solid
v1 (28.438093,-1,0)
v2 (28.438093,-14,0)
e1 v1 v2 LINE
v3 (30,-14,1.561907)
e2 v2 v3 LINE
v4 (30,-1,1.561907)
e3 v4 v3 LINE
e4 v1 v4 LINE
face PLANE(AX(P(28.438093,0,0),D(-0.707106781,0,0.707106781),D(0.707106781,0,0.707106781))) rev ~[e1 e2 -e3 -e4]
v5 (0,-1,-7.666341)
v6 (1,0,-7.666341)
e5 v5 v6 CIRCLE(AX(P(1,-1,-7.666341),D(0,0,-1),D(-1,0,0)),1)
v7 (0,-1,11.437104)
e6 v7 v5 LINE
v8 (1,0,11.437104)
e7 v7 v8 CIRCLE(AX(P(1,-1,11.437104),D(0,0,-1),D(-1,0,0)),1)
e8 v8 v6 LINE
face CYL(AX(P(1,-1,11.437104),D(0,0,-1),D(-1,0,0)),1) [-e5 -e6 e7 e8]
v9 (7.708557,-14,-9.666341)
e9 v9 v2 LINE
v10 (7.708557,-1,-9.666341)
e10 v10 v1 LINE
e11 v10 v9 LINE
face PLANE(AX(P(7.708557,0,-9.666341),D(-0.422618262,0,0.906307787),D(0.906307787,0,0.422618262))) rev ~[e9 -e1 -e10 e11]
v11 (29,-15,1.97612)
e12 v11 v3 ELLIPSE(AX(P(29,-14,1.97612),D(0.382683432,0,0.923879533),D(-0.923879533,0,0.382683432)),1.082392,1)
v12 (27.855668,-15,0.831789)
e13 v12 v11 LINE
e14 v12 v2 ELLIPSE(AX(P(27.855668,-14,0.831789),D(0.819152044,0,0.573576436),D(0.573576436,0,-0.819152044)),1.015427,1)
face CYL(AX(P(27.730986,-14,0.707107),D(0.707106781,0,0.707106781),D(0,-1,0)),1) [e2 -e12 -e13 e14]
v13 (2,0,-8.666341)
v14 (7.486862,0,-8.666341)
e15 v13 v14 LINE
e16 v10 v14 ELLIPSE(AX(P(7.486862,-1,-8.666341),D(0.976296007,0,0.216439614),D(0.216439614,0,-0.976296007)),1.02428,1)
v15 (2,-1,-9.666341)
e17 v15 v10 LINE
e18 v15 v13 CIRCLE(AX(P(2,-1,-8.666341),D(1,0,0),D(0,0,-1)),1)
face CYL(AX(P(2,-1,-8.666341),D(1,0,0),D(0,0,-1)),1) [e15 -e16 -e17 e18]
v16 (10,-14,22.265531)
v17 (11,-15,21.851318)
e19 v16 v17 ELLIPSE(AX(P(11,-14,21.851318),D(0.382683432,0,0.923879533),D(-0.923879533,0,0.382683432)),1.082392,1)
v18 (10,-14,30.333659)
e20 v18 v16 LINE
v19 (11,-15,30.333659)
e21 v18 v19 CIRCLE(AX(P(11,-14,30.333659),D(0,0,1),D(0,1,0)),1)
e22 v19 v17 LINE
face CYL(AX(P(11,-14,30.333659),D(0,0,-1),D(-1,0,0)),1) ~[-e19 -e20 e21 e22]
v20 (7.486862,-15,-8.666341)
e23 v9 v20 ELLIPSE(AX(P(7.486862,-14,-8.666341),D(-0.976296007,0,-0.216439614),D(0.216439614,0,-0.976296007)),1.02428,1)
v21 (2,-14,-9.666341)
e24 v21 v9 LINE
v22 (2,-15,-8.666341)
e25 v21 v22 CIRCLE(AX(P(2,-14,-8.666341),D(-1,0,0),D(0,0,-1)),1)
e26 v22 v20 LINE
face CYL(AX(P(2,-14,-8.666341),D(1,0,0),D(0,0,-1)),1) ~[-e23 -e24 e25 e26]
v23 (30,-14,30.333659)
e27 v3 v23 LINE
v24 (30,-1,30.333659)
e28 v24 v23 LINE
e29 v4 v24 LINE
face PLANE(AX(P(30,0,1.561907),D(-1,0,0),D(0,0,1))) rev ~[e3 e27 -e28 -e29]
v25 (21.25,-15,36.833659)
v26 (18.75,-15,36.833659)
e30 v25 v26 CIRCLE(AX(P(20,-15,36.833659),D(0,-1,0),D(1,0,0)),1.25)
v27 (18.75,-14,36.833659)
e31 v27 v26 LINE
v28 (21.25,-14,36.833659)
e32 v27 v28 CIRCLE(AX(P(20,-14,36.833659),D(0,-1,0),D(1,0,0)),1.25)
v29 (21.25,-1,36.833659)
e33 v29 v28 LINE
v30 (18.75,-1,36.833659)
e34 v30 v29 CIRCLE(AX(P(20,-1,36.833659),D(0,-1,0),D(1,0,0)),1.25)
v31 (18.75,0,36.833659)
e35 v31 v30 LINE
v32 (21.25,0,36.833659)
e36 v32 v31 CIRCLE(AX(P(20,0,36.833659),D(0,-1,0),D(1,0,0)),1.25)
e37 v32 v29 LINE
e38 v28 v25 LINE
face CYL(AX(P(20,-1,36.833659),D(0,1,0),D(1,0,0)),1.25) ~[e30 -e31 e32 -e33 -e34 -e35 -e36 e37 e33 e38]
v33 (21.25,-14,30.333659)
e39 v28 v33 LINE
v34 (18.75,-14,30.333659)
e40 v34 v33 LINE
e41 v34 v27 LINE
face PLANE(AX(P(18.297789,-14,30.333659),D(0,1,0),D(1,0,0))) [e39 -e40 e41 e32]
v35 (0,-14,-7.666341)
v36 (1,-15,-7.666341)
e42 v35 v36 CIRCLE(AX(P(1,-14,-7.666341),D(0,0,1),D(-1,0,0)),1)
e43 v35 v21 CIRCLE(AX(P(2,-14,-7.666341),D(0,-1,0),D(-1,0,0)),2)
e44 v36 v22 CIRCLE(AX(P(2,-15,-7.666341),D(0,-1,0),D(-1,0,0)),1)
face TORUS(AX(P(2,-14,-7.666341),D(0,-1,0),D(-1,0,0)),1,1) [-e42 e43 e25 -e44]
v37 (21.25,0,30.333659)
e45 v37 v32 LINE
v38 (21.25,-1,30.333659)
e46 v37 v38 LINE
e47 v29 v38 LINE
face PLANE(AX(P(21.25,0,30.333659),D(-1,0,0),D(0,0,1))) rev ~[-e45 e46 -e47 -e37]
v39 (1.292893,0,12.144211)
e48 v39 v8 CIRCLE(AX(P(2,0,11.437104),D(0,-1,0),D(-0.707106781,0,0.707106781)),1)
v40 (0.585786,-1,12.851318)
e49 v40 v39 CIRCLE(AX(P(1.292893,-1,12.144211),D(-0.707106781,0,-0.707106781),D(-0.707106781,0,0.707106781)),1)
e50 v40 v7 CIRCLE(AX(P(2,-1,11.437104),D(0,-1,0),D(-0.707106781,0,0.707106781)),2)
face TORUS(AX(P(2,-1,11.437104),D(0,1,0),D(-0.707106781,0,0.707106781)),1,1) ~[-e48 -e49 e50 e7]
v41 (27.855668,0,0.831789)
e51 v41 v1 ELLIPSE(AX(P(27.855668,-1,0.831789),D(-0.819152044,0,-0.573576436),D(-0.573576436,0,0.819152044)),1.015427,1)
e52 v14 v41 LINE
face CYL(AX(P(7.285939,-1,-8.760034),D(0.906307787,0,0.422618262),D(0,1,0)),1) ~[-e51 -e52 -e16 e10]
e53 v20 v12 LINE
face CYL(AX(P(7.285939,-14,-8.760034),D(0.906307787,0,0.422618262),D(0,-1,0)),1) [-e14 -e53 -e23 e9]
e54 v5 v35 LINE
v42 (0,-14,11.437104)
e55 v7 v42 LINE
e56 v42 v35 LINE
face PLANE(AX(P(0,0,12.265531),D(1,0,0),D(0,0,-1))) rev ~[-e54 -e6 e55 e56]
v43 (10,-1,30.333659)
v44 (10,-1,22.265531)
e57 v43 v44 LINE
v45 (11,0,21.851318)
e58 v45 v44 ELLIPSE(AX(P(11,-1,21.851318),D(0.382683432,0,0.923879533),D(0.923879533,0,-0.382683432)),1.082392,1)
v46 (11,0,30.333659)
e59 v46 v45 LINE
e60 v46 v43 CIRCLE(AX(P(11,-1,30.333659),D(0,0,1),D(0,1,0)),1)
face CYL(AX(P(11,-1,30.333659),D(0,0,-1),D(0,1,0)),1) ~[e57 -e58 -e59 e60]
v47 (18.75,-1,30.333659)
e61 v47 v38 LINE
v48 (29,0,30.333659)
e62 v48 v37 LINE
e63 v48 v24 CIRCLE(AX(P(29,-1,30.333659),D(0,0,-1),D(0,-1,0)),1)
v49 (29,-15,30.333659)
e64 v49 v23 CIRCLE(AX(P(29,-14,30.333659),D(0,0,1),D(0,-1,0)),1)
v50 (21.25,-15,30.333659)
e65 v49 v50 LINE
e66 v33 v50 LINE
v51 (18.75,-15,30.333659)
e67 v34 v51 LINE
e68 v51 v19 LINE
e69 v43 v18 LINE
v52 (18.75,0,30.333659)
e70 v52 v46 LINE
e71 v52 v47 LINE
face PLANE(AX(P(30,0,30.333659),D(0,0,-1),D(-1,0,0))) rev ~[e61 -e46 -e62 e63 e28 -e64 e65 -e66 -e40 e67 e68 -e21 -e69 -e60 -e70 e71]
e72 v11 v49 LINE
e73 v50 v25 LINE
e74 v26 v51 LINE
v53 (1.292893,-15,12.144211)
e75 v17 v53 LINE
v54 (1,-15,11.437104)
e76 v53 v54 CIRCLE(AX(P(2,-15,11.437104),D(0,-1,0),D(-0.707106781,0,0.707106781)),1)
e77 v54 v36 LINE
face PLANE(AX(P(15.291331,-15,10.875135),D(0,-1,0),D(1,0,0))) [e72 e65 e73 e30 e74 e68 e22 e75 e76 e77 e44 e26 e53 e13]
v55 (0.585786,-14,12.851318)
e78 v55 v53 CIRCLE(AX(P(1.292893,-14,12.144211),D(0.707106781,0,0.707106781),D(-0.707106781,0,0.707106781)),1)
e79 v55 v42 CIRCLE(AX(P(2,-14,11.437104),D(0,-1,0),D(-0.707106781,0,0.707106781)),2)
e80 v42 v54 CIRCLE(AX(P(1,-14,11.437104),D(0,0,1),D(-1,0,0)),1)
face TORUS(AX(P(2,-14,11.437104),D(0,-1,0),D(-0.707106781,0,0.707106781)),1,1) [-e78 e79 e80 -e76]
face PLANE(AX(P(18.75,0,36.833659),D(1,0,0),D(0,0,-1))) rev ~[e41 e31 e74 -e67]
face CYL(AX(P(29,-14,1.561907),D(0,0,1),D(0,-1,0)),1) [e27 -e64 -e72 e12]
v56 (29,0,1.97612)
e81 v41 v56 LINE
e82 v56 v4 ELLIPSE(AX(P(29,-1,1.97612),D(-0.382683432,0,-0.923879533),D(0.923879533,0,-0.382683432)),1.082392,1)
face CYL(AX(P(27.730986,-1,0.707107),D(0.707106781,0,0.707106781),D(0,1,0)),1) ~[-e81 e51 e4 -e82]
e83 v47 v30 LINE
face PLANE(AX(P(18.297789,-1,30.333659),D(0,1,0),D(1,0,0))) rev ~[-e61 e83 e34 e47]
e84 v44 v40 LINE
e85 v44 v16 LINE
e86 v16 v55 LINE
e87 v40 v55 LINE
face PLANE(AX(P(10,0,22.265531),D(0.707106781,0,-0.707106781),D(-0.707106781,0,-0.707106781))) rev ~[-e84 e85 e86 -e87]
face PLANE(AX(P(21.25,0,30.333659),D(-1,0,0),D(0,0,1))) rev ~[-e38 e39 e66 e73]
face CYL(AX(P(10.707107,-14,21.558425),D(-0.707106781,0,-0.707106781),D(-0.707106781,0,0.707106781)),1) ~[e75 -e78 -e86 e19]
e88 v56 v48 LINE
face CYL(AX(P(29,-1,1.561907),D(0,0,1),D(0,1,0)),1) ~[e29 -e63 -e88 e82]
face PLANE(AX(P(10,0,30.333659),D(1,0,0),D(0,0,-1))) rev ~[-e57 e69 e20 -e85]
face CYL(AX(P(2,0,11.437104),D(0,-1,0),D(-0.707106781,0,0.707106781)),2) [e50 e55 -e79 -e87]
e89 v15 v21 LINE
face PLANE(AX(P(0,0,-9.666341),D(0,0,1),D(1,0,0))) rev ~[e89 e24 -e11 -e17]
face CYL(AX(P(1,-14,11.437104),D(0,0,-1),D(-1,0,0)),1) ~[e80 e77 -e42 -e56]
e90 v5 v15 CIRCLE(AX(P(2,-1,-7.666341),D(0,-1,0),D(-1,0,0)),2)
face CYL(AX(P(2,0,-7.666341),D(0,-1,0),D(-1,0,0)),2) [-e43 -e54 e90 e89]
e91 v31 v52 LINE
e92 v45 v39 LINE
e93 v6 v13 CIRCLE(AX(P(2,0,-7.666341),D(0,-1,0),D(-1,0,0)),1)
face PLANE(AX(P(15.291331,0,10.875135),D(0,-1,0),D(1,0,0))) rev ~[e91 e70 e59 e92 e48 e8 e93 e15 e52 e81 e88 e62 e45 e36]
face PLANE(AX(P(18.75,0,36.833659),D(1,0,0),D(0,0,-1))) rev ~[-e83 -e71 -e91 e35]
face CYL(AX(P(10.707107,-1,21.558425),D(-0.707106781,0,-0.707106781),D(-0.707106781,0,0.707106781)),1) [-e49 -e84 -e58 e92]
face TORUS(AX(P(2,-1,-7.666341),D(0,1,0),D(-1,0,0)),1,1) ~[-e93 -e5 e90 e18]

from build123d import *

# Parameters (mm, degrees)
F2_DEPTH  = 15
F3_R      = 2
F4_R      = 1
F7_DEPTH  = 15
F8_W      = 3.7031254775
F8_H      = 13
F9_DEPTH  = 25
F10_R     = 1.25
F11_DEPTH = 13


with BuildPart() as f2:
    # F1 (on Front) → F2 (new body)
    with BuildSketch(Plane.XZ):
        Polygon((10, 22.2655313462), (0, 12.2655313462), (0, -9.6663414017), (7.7085571088, -9.6663414017), (28.4380931407, 0), (30, 1.5619068593), (30, 30.3336585983), (10, 30.3336585983), align=None)
    extrude(amount=F2_DEPTH)

    # F3
    f3_edges = [f2.edges().sort_by_distance(p)[0] for p in [
        (0, -7.5, 12.265531),
        (0, -7.5, -9.666341),
    ]]
    fillet(f3_edges, radius=F3_R)

    # F4
    f4_edges = [f2.edges().sort_by_distance(p)[0] for p in [
        (5.292893, -15, 17.558425),
        (10, -15, 26.299595),
        (10, 0, 26.299595),
        (5.292893, 0, 17.558425),
        (18.073325, -15, -4.833171),
        (30, -15, 15.947783),
        (29.219047, -15, 0.780953),
        (29.219047, 0, 0.780953),
        (30, 0, 15.947783),
        (18.073325, 0, -4.833171),
        (0.152241, 0, 12.202471),
        (0, 0, 1.885381),
        (0.585786, 0, -9.080555),
        (4.854279, 0, -9.666341),
        (0.152241, -15, 12.202471),
        (0, -15, 1.885381),
        (0.585786, -15, -9.080555),
        (4.854279, -15, -9.666341),
    ]]
    fillet(f4_edges, radius=F4_R)

    # F6 (on Front) → F7 (join)
    with BuildSketch(Plane.XZ):
        with BuildLine():
            Line((18.75, 30.3336585983), (21.25, 30.3336585983))
            Line((21.25, 30.3336585983), (21.25, 36.8336585983))
            ThreePointArc((21.25, 36.8336585983), (20, 38.0836585983), (18.75, 36.8336585983))
            Line((18.75, 36.8336585983), (18.75, 30.3336585983))
        make_face()
    extrude(amount=F7_DEPTH)

    # F8 (on face) → F9 (cut)
    with BuildSketch(Plane.XY.offset(30.3336585983)):
        with Locations((20.149352029, -7.5)):
            Rectangle(F8_W, F8_H)
    extrude(amount=F9_DEPTH, mode=Mode.SUBTRACT)

    # F10 (on face) → F11 (join)
    with BuildSketch(Plane.XZ.offset(1)):
        with Locations((20, 36.8336585983)):
            Circle(F10_R)
    extrude(amount=F11_DEPTH)


solid = f2.part
